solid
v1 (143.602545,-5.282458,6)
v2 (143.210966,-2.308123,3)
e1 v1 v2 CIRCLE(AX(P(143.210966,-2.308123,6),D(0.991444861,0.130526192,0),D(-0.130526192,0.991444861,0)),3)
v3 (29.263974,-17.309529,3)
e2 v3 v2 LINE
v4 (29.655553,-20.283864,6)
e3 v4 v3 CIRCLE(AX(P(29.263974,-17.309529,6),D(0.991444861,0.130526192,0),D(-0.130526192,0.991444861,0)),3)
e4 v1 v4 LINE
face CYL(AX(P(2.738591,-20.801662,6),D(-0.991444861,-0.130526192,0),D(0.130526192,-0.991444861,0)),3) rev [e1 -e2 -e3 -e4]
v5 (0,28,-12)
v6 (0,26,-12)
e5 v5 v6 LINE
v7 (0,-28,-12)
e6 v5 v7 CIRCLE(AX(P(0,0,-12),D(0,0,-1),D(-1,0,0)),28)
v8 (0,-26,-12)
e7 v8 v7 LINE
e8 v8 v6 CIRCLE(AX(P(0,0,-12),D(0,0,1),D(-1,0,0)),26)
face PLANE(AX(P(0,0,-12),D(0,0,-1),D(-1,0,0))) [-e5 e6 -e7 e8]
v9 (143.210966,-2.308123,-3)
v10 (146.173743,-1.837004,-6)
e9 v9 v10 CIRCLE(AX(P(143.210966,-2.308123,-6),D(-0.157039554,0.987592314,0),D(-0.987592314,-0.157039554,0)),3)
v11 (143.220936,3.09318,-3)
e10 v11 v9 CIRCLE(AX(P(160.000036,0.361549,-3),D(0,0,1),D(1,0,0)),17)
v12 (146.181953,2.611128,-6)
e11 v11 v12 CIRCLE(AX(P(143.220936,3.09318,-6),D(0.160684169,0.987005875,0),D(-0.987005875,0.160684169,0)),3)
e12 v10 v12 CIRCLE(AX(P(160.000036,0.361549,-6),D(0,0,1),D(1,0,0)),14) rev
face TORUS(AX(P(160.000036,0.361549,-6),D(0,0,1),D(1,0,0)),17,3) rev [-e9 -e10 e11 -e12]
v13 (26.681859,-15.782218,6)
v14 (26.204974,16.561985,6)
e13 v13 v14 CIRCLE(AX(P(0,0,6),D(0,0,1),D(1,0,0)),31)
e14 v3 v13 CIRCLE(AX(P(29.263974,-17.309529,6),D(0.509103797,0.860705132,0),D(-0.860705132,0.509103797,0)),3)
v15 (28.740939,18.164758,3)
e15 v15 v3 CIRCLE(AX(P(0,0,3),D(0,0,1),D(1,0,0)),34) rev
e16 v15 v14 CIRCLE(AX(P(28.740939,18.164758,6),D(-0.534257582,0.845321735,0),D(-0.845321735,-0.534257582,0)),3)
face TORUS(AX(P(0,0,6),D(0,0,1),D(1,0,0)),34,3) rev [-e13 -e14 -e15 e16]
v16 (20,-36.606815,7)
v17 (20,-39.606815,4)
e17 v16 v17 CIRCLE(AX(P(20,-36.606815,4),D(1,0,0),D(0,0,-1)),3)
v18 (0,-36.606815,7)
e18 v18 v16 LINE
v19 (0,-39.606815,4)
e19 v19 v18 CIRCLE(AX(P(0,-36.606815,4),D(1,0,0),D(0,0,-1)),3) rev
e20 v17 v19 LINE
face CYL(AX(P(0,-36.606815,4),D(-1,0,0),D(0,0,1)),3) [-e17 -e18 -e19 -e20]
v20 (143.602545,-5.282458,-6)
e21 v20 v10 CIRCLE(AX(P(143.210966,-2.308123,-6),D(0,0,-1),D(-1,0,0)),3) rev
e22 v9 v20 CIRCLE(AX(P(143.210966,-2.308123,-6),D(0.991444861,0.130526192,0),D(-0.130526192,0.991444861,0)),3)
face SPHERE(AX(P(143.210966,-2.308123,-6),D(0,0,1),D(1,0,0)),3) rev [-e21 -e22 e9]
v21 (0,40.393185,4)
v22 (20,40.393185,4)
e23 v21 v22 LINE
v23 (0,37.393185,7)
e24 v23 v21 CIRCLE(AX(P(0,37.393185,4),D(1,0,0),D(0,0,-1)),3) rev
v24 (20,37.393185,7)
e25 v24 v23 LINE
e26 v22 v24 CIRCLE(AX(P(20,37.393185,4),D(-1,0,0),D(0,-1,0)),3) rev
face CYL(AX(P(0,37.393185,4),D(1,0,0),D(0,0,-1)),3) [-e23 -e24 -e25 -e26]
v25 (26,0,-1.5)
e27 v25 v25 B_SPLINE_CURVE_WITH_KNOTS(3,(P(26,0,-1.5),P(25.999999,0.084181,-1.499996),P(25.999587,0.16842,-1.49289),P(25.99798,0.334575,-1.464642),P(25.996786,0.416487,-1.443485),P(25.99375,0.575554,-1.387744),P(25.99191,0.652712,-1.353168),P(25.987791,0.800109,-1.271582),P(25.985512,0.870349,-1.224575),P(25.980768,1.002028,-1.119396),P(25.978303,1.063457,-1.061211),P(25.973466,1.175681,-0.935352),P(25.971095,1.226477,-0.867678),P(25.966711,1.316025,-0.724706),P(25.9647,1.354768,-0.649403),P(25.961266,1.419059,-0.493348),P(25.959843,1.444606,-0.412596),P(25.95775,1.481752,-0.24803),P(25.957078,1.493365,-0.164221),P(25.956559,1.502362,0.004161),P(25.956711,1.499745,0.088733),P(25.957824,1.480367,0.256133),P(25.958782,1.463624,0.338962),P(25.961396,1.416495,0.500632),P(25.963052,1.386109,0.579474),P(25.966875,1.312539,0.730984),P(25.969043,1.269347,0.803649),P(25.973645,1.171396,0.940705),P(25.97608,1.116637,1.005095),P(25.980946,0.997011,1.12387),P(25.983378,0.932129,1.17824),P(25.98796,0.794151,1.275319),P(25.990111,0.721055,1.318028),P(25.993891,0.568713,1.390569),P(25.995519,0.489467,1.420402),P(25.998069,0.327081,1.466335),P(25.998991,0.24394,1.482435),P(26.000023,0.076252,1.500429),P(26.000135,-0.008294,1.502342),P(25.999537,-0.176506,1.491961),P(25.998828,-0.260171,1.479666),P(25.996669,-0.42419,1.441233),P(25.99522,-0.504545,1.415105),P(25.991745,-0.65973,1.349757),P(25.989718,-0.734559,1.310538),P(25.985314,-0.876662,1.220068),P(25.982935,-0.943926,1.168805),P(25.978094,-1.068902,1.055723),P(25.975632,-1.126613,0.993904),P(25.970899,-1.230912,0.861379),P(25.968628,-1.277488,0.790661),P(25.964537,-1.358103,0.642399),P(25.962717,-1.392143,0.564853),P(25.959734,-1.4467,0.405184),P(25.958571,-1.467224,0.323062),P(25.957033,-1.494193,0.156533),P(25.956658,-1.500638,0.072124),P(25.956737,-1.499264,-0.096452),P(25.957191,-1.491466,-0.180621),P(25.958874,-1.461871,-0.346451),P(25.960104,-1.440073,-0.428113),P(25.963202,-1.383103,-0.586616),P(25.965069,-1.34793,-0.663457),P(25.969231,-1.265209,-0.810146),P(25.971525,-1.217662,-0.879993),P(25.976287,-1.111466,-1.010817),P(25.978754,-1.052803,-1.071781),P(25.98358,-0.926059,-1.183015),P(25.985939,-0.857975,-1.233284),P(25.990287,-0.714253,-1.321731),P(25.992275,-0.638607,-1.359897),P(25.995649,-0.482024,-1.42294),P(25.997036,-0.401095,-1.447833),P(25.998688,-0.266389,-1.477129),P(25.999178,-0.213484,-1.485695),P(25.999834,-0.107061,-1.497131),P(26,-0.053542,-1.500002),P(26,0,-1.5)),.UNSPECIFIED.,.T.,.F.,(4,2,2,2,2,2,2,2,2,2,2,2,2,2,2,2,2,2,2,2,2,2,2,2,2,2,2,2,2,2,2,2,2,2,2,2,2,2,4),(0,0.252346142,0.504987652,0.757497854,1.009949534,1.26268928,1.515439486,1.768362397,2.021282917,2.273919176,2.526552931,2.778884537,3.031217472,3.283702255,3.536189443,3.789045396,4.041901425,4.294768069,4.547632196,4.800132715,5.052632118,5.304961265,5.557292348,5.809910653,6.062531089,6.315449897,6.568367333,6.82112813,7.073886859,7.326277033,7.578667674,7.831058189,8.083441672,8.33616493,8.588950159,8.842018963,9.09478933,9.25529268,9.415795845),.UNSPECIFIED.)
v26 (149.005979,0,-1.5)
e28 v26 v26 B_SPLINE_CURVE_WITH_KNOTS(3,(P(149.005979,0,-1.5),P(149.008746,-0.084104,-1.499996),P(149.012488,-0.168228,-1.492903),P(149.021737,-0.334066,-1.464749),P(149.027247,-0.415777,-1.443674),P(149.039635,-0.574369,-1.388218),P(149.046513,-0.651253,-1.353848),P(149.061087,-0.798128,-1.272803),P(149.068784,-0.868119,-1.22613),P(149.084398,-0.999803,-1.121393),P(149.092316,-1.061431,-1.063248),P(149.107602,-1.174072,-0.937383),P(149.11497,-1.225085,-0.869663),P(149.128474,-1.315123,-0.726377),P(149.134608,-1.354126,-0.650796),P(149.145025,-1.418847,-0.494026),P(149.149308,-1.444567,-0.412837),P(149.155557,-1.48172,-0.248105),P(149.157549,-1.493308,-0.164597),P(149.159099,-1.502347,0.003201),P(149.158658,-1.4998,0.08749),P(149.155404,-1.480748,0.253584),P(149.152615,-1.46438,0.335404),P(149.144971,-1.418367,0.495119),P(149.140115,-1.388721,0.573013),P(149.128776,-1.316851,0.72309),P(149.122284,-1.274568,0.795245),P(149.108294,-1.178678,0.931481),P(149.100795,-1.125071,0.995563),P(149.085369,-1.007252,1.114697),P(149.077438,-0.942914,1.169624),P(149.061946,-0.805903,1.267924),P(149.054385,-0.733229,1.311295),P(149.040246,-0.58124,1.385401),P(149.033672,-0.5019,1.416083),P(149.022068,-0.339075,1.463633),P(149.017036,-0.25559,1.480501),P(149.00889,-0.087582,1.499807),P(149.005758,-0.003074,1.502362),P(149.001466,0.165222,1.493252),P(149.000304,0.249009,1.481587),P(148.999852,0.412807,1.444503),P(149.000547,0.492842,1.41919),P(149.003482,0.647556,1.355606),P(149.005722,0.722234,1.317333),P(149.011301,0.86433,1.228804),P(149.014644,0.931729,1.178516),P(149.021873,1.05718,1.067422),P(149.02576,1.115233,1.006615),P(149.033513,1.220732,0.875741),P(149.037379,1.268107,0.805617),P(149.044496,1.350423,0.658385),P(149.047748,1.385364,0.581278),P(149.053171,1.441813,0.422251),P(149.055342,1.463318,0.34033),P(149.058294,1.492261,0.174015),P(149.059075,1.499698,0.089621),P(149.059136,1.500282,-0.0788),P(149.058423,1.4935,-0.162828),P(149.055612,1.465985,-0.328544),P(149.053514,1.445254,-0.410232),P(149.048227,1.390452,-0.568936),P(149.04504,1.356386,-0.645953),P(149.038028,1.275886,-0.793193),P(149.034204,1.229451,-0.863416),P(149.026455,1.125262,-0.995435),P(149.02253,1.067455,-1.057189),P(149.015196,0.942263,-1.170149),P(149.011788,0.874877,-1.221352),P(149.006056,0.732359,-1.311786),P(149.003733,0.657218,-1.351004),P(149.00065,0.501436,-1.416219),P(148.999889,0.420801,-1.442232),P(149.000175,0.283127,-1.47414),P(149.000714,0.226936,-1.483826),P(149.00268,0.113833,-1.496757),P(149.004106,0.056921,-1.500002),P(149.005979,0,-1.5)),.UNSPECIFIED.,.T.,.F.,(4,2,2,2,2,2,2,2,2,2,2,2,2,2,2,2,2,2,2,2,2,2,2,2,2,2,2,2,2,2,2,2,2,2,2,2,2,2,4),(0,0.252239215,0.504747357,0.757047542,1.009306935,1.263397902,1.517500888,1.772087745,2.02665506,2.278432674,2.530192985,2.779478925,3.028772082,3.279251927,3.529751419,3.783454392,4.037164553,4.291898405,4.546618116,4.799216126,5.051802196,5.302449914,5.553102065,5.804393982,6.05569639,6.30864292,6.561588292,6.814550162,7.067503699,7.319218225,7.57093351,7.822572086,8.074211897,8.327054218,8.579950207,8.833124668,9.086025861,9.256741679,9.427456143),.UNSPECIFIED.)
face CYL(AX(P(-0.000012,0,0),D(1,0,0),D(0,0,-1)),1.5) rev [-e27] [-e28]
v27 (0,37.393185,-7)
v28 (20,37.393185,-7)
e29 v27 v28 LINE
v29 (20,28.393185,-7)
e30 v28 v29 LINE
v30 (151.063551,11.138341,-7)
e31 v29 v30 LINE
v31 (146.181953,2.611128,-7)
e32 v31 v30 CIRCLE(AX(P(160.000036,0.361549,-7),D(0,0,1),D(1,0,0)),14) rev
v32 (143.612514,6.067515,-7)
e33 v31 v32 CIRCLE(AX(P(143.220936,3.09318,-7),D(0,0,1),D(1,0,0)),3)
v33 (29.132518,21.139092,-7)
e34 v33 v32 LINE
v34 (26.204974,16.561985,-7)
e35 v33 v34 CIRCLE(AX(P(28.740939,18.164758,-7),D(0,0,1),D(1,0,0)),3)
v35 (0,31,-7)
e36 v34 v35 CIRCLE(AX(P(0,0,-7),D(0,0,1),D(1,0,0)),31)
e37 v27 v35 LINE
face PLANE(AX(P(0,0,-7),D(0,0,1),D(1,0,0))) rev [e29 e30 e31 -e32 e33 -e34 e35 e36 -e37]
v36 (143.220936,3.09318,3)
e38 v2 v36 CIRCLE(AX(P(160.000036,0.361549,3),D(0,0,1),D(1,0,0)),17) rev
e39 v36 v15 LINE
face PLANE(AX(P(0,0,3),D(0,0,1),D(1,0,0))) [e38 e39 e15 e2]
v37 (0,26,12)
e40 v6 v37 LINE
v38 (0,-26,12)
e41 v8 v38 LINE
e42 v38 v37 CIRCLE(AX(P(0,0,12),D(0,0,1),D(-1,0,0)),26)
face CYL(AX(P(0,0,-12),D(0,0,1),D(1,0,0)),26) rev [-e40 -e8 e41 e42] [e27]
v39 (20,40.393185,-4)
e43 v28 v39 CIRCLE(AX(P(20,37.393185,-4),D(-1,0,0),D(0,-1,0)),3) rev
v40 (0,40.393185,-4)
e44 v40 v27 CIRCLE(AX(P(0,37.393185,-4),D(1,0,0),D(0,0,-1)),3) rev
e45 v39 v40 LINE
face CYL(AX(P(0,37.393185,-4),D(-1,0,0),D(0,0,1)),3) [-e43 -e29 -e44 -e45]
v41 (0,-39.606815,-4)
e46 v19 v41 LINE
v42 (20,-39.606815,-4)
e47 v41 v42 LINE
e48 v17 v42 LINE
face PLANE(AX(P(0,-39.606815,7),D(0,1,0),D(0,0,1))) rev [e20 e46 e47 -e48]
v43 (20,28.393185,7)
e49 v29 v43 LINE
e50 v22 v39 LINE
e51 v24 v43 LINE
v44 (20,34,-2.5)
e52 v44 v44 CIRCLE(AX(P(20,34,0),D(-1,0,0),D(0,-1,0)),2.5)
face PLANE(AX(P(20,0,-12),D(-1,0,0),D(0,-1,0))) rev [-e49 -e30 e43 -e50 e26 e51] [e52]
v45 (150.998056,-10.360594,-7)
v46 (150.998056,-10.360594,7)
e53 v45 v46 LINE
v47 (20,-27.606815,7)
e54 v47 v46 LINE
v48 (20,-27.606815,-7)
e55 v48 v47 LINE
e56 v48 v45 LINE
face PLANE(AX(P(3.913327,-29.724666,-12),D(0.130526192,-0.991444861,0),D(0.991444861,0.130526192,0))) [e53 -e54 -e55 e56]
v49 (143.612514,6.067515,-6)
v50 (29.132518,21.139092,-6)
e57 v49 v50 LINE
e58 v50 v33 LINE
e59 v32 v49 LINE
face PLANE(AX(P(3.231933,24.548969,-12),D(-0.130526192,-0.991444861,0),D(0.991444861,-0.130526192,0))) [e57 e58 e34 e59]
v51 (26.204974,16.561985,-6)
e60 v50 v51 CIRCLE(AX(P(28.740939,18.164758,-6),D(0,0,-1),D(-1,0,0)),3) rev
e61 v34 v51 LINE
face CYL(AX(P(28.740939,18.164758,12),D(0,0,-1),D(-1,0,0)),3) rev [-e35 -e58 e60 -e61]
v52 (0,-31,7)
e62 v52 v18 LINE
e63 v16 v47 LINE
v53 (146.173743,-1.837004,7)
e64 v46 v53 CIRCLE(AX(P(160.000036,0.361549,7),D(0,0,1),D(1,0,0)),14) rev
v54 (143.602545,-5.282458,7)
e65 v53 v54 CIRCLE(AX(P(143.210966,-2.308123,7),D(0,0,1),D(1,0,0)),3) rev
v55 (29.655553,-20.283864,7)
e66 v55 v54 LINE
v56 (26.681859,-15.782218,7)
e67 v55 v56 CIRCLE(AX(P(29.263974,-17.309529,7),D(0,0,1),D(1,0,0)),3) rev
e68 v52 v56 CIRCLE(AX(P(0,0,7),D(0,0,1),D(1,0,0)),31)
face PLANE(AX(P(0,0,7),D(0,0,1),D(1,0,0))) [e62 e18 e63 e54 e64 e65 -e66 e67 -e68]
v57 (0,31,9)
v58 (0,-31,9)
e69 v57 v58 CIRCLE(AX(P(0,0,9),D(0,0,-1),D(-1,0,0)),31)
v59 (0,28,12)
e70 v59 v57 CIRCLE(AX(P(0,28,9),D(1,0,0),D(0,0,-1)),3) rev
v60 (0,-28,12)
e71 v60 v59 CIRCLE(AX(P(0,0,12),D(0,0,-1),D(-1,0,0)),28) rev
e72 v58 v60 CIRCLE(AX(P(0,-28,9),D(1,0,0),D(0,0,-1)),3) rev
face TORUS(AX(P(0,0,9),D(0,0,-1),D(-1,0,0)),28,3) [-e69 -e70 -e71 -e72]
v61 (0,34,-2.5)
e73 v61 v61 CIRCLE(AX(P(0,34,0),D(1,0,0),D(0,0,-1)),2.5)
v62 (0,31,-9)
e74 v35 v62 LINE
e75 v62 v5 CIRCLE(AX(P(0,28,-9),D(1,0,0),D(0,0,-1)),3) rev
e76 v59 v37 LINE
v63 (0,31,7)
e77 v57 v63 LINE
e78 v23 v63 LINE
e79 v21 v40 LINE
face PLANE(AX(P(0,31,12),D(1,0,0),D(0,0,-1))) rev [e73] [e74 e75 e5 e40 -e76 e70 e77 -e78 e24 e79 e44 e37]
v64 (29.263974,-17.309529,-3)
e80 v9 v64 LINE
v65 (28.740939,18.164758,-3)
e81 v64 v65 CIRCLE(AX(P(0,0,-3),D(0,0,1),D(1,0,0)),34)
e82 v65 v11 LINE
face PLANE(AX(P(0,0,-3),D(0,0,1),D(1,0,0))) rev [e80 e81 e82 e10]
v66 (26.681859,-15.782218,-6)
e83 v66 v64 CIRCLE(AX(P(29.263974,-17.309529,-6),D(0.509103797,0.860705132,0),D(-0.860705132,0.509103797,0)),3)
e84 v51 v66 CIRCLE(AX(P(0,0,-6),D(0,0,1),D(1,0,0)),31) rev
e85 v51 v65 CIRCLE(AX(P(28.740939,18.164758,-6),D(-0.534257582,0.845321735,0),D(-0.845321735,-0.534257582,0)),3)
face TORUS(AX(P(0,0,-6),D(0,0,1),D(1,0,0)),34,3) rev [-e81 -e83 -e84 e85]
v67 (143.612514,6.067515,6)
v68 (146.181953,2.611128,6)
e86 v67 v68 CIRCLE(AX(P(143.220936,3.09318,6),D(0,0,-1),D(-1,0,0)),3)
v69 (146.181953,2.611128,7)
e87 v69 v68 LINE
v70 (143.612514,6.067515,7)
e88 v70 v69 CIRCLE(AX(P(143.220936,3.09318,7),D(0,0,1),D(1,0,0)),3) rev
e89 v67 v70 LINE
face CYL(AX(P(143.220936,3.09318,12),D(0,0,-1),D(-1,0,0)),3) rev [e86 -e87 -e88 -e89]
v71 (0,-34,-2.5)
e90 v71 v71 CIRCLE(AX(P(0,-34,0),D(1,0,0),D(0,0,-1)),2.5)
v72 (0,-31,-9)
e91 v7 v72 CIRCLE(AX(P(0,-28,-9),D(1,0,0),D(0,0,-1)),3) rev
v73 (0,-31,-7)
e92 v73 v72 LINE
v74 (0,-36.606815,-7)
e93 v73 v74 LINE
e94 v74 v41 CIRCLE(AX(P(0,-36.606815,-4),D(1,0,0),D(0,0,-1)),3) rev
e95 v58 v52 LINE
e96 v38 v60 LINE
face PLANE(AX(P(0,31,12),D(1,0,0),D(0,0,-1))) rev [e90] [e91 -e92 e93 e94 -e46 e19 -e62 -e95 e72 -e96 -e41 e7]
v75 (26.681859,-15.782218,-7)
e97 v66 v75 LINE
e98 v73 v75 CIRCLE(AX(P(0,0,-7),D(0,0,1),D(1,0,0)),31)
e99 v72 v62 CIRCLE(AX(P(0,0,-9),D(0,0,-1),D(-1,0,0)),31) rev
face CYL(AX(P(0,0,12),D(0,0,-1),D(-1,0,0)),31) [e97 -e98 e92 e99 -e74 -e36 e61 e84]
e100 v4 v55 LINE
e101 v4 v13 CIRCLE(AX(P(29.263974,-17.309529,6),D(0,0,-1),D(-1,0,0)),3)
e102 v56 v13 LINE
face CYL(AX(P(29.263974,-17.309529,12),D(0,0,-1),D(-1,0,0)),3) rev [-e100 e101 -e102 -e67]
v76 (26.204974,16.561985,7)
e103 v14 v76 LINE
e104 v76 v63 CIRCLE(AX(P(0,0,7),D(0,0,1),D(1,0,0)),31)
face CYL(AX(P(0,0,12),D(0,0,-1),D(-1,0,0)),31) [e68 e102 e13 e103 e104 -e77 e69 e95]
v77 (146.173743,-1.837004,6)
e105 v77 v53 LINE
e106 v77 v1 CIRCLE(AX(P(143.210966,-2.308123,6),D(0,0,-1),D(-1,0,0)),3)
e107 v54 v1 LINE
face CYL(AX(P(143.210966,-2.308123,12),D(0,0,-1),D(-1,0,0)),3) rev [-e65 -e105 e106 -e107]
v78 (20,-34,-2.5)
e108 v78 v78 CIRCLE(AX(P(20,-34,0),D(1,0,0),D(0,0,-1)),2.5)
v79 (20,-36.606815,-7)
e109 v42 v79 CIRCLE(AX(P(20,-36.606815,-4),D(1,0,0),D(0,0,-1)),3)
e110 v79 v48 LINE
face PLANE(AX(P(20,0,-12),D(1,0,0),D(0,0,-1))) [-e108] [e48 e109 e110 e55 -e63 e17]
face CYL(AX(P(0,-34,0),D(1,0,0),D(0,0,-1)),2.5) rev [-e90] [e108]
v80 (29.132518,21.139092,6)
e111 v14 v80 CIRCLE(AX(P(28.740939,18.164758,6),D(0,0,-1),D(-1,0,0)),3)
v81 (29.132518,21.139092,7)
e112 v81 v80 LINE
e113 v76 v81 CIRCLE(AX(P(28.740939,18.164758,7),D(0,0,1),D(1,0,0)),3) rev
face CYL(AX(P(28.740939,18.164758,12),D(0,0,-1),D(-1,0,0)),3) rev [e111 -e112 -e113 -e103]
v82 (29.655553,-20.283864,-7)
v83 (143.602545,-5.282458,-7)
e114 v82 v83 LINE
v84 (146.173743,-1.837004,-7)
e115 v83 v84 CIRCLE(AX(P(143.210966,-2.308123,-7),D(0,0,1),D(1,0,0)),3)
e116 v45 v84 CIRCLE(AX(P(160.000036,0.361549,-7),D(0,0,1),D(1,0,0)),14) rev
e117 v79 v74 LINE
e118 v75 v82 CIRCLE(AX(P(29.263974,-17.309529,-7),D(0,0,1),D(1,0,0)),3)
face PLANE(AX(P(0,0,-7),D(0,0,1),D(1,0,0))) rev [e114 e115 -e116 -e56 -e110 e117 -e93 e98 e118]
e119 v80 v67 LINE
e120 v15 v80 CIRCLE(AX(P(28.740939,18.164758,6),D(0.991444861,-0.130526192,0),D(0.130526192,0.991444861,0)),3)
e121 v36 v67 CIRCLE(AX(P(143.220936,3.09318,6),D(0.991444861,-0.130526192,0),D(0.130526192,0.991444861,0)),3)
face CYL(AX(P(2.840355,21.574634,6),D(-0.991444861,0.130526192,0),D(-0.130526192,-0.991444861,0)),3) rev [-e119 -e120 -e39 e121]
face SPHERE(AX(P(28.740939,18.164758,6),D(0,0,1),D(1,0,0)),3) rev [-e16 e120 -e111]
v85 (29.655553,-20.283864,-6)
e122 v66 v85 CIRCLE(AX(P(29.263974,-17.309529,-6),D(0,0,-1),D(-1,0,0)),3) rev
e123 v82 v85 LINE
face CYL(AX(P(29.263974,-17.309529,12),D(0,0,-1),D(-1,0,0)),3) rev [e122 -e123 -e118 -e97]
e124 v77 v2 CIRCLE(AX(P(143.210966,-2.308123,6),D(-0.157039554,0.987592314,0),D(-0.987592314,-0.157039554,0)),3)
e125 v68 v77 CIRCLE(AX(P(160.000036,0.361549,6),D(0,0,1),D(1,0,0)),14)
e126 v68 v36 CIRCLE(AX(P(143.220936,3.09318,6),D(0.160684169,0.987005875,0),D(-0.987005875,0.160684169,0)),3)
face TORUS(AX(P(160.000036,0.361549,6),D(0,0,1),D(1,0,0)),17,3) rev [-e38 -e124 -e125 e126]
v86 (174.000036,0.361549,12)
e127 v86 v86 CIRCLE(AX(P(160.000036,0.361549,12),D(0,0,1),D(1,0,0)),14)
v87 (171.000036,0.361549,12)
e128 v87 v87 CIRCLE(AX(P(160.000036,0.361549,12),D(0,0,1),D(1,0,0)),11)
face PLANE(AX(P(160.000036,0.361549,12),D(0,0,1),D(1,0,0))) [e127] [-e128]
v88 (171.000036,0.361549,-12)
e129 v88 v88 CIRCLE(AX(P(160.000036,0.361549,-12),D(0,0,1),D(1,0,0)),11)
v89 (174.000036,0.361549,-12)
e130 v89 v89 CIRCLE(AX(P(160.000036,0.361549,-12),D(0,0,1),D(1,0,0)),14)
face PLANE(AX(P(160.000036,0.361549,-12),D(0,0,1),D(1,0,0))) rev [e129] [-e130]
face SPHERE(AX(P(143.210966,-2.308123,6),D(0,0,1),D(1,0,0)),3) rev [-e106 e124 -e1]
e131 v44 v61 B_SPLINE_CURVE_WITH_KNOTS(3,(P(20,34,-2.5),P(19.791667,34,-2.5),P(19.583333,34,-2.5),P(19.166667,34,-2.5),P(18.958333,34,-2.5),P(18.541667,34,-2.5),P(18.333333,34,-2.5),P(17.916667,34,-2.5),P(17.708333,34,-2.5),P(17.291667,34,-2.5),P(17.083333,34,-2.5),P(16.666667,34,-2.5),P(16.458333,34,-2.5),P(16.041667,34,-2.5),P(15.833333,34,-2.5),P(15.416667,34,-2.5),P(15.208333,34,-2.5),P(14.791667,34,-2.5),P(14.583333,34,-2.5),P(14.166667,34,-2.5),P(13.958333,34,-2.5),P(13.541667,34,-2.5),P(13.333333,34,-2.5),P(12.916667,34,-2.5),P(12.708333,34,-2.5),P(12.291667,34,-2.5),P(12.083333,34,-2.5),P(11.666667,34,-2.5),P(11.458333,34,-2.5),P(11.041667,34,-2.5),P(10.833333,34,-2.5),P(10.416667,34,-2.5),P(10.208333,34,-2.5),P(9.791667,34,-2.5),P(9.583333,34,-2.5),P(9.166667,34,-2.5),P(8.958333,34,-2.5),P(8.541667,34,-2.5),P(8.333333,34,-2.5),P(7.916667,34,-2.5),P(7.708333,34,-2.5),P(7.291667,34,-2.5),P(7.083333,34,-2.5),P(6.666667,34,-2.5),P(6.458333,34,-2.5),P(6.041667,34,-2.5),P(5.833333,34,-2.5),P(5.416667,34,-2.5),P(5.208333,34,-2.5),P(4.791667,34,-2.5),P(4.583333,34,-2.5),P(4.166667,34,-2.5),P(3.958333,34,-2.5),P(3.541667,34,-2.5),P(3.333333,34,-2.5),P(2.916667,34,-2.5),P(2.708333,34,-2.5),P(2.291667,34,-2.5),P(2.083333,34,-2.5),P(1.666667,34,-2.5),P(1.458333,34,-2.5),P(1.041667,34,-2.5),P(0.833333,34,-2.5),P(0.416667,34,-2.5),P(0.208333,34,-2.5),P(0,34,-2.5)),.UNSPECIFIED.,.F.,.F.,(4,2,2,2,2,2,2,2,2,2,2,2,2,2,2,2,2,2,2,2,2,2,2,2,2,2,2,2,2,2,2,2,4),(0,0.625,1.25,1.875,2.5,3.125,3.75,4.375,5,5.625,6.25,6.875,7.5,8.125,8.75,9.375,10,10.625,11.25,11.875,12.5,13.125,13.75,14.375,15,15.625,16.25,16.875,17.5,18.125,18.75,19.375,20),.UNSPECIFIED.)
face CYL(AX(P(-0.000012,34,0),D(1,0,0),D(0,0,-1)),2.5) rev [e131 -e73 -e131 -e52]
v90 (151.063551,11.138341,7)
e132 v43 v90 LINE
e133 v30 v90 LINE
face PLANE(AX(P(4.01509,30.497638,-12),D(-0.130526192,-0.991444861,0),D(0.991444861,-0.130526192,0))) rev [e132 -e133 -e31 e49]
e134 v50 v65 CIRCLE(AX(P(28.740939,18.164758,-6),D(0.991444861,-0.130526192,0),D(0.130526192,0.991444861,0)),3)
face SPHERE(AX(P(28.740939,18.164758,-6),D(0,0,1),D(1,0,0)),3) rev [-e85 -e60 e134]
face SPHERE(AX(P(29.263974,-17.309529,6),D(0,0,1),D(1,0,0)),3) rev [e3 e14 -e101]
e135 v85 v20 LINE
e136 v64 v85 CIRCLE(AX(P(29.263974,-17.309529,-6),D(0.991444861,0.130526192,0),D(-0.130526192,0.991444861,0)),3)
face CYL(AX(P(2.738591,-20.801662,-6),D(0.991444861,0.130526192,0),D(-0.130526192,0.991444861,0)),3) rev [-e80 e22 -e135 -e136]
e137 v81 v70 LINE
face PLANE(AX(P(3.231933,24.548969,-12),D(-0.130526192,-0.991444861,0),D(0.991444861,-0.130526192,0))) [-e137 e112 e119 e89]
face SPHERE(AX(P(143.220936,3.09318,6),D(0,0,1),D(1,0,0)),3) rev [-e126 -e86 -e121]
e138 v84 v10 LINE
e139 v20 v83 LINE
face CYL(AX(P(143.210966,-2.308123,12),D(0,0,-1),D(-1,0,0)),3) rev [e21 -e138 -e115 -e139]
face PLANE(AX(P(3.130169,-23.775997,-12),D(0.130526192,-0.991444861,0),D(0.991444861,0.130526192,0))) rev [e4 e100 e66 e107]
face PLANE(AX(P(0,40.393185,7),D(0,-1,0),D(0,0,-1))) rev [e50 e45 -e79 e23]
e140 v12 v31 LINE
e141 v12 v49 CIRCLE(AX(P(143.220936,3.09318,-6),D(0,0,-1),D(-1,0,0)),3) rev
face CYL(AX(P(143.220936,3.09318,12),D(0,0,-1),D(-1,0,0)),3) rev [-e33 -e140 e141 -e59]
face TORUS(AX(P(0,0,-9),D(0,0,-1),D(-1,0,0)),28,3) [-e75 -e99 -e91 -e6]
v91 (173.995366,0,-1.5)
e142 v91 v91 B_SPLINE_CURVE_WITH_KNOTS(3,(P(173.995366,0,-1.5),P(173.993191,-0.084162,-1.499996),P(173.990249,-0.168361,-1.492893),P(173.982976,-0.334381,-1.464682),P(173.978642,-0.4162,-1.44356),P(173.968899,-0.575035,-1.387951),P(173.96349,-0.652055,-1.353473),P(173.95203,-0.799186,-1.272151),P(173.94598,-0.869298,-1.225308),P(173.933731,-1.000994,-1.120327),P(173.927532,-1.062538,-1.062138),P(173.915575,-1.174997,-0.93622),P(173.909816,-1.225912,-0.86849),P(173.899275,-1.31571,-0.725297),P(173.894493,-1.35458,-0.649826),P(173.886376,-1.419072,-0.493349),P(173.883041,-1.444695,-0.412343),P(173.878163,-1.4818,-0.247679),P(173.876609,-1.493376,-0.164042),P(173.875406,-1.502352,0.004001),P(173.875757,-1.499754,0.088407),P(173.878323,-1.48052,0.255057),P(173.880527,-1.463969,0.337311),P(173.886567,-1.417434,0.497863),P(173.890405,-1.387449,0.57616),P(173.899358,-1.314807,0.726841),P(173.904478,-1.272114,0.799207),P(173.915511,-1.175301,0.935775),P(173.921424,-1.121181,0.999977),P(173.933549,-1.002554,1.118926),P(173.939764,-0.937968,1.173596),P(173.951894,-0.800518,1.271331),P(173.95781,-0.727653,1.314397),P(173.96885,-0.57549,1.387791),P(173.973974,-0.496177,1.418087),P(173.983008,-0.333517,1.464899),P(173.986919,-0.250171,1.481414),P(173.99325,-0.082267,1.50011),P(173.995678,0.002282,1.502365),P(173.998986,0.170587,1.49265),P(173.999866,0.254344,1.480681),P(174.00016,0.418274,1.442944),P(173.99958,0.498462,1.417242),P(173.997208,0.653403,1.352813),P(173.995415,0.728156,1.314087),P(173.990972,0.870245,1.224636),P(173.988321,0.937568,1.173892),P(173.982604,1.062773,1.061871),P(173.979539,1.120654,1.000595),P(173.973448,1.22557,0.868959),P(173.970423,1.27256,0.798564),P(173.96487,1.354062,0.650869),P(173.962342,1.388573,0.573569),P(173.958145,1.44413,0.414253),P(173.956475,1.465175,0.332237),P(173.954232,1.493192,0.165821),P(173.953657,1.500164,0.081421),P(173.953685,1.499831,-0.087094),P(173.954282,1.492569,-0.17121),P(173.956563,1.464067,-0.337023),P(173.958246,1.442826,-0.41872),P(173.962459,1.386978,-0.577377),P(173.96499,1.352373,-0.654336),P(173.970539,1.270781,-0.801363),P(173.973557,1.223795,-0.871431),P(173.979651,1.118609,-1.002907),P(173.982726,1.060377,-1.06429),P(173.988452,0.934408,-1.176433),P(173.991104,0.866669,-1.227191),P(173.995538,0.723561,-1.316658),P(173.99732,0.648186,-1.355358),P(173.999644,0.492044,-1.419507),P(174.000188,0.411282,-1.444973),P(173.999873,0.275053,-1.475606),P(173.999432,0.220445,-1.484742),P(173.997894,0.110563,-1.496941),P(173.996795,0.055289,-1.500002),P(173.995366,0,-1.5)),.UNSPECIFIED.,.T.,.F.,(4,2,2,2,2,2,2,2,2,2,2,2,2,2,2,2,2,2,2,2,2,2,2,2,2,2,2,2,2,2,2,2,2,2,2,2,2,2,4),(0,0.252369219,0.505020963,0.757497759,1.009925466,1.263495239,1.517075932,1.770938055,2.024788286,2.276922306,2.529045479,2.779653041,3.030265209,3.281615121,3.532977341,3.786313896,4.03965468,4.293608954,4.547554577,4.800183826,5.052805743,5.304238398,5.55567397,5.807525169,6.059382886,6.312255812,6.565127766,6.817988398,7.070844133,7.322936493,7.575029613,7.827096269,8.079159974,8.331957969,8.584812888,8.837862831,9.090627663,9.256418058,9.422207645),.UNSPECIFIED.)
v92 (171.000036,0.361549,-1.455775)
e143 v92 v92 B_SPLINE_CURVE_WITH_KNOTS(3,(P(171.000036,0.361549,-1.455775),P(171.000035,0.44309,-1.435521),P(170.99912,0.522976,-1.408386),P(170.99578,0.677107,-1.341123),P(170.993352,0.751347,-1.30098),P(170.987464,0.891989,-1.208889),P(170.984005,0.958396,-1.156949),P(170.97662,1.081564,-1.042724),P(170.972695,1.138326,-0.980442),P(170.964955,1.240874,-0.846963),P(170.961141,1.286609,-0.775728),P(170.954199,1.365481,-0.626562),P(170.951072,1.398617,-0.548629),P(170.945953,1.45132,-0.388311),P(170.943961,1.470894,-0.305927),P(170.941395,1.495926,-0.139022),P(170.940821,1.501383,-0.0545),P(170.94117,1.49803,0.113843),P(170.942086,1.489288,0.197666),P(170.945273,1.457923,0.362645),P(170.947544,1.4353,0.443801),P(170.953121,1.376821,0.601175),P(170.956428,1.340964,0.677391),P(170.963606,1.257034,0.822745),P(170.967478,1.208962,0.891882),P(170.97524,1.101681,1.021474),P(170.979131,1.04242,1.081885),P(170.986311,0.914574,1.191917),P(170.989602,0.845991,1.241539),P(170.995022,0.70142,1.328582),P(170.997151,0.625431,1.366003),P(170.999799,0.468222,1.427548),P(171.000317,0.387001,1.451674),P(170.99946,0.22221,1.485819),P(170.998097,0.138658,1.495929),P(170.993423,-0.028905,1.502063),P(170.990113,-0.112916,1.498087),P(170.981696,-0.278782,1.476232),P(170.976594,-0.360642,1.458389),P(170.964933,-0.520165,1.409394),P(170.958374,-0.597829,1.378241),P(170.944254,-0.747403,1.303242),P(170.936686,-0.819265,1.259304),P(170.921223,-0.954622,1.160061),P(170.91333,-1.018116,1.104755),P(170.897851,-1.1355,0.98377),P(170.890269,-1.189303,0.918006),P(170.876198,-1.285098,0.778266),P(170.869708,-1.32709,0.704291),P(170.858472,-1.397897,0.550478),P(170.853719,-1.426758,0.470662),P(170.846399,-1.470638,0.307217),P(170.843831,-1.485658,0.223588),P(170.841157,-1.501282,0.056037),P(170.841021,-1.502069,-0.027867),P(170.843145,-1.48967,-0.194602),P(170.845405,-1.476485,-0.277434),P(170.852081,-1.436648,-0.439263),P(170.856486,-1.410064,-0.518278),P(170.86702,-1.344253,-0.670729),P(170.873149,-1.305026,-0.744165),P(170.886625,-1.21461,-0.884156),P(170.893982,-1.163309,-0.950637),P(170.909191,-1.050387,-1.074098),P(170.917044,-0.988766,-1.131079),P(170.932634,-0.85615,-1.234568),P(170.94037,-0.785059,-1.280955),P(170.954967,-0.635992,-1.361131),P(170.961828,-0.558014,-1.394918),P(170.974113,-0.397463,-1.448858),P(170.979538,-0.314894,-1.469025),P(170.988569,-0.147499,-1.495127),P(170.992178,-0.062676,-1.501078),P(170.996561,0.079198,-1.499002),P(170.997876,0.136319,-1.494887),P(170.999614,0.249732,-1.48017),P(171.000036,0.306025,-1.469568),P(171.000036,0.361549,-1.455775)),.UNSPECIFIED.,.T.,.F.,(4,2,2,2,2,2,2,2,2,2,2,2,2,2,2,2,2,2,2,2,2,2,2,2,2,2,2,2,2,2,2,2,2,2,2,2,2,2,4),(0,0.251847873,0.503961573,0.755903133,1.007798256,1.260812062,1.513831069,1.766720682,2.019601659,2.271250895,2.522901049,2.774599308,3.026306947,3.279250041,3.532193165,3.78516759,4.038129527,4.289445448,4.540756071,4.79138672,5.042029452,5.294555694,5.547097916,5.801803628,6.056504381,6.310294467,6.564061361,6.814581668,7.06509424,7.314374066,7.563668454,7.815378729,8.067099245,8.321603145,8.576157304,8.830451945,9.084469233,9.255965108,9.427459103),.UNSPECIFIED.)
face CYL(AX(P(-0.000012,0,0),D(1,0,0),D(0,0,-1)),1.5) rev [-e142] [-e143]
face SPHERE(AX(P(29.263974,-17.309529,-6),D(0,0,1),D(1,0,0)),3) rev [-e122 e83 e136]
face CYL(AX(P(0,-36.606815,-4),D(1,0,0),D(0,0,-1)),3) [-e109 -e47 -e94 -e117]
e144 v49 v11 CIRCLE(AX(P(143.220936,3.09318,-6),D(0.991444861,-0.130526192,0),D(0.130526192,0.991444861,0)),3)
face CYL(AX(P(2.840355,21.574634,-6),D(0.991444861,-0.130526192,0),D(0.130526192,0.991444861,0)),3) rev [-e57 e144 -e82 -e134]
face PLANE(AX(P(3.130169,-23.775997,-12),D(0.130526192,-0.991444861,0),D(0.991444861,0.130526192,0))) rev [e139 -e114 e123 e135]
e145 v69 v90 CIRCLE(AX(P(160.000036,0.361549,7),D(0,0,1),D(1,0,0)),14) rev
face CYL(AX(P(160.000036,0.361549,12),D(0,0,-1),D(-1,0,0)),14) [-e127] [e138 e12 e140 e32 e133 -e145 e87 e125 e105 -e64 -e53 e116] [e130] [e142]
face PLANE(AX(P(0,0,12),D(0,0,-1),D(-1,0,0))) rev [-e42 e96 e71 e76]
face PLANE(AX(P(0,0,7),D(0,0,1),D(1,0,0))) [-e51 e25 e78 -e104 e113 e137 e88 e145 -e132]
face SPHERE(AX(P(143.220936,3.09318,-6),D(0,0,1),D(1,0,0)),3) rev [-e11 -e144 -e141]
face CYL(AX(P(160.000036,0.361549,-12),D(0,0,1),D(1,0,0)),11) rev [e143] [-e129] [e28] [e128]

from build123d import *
from build123d.topology import SkipClean

# Parameters (mm, degrees)
EXTRUDE_1_DEPTH          = 12
SKETCH_2_W               = 174
SKETCH_2_H               = 80
EXTRUDE_2_DEPTH          = 7
CUT_EXTRUDE_1_DEPTH      = 180.0296327
CUT_EXTRUDE_1_DEPTH_BACK = 180.0296327
SKETCH_5_R               = 14
EXTRUDE_5_DEPTH          = 12
CUT_EXTRUDE_2_DEPTH      = 181.23213316
CUT_EXTRUDE_2_DEPTH_BACK = 181.23213316
SKETCH_11_R              = 11
CUT_EXTRUDE_3_DEPTH      = 180.029667439
CUT_EXTRUDE_3_DEPTH_BACK = 180.029667439
CUT_EXTRUDE_4_DEPTH      = 180.029667439
CUT_EXTRUDE_4_DEPTH_BACK = 180.029667439
CUT_EXTRUDE_6_DEPTH      = 180.029667439
CUT_EXTRUDE_6_DEPTH_BACK = 180.029667439
EXTRUDE_6_DEPTH          = 3
CUT_EXTRUDE_7_DEPTH      = 180.029667439
CUT_EXTRUDE_7_DEPTH_BACK = 180.029667439
SKETCH_19_R              = 2.5
CUT_EXTRUDE_8_DEPTH      = 160.660954506
CUT_EXTRUDE_8_DEPTH_BACK = 160.660954506
SKETCH_20_R              = 2.5
CUT_EXTRUDE_9_DEPTH      = 180.029667439
CUT_EXTRUDE_9_DEPTH_BACK = 180.029667439
SKETCH_21_R              = 1.5
FILLET_1_R               = 3
FILLET_2_R               = 3
FILLET_3_R               = 3
FILLET_START             = -7
FILLET_4_DEPTH           = 14
FILLET_5_R               = 3
FILLET_6_R               = 3


with BuildPart() as part:
    # 草图1 → 凸台-拉伸1 (new, symmetric)
    with BuildSketch(Plane.XY):
        with BuildLine():
            Line((0, 31), (0, -31))
            ThreePointArc((0, -31), (31, 0), (0, 31))
        make_face()
    extrude(amount=EXTRUDE_1_DEPTH, both=True)

    # 草图2 → 凸台-拉伸2 (add, symmetric)
    with BuildSketch(Plane.XY):
        with Locations((87, 0.393184881)):
            Rectangle(SKETCH_2_W, SKETCH_2_H)
    extrude(amount=EXTRUDE_2_DEPTH, both=True)

    # 草图4 → 切除-拉伸1 (cut, two sides: drawn at the far end of the back side and taken through both)
    with BuildSketch(Plane.XY.offset(-CUT_EXTRUDE_1_DEPTH_BACK)):
        with BuildLine():
            Line((0, 26), (0, -26))
            ThreePointArc((0, -26), (26, 0), (0, 26))
        make_face()
    extrude(amount=CUT_EXTRUDE_1_DEPTH + CUT_EXTRUDE_1_DEPTH_BACK, mode=Mode.SUBTRACT)

    # 草图5 → 凸台-拉伸5 (add, symmetric)
    with BuildSketch(Plane.XY):
        with Locations((160.000035743, 0.361549397)):
            Circle(SKETCH_5_R)
    extrude(amount=EXTRUDE_5_DEPTH, both=True)

    # 草图11 → 切除-拉伸2 (cut, two sides: drawn at the far end of the back side and taken through both)
    with BuildSketch(Plane.XY.offset(12).offset(-CUT_EXTRUDE_2_DEPTH_BACK)):
        with Locations((160.000035743, 0.361549397)):
            Circle(SKETCH_11_R)
    extrude(amount=CUT_EXTRUDE_2_DEPTH + CUT_EXTRUDE_2_DEPTH_BACK, mode=Mode.SUBTRACT)

    # 草图12 → 切除-拉伸3 (cut, two sides: drawn at the far end of the back side and taken through both)
    with BuildSketch(Plane.XY.offset(-CUT_EXTRUDE_3_DEPTH_BACK)):
        with BuildLine():
            ThreePointArc((150.998055783, -10.360593896), (165.91494405, -12.327574282), (174.000035743, 0.361549397))
            Line((174.000035743, 0.361549397), (174, -39.606815119))
            Line((174, -39.606815119), (20, -39.606815119))
            Line((20, -39.606815119), (20, -27.606815119))
            Line((20, -27.606815119), (150.998055783, -10.360593896))
        make_face()
    extrude(amount=CUT_EXTRUDE_3_DEPTH + CUT_EXTRUDE_3_DEPTH_BACK, mode=Mode.SUBTRACT)

    # 草图13 → 切除-拉伸4 (cut, two sides: drawn at the far end of the back side and taken through both)
    with BuildSketch(Plane.XY.offset(-CUT_EXTRUDE_4_DEPTH_BACK)):
        with BuildLine():
            Line((20, 28.393184881), (151.063550898, 11.138341063))
            ThreePointArc((151.063550898, 11.138341063), (165.939252971, 13.039313345), (174, 0.393184881))
            Line((174, 0.393184881), (174, 40.393184881))
            Line((174, 40.393184881), (20, 40.393184881))
            Line((20, 40.393184881), (20, 28.393184881))
        make_face()
    extrude(amount=CUT_EXTRUDE_4_DEPTH + CUT_EXTRUDE_4_DEPTH_BACK, mode=Mode.SUBTRACT)

    # 草图14 → 切除-拉伸6 (cut, two sides: drawn at the far end of the back side and taken through both)
    with SkipClean():  # the faces are left unmerged after this step: merging them gives an invalid solid
        with BuildSketch(Plane.XY.offset(-CUT_EXTRUDE_6_DEPTH_BACK)):
            with BuildLine():
                Line((147.02443227, 5.618327355), (21.724512141, 22.114374787))
                ThreePointArc((21.724512141, 22.114374787), (30.993578045, 0.630967477), (22.606548392, -21.21188275))
                Line((22.606548392, -21.21188275), (147.000250841, -4.835141138))
                ThreePointArc((147.000250841, -4.835141138), (146.000073201, 0.393934732), (147.02443227, 5.618327355))
            make_face()
        extrude(amount=CUT_EXTRUDE_6_DEPTH + CUT_EXTRUDE_6_DEPTH_BACK, mode=Mode.SUBTRACT)
    add(part.part.scale(1), mode=Mode.REPLACE)  # the faces are merged on a copy

    # 草图17 → 凸台-拉伸6 (add, symmetric)
    with BuildSketch(Plane.XY):
        with BuildLine():
            ThreePointArc((22.606548392, -21.21188275), (30.993578045, 0.630967477), (21.724512141, 22.114374787))
            Line((21.724512141, 22.114374787), (147.02443227, 5.618327355))
            ThreePointArc((147.02443227, 5.618327355), (146.000073201, 0.393934732), (147.000250841, -4.835141138))
            Line((147.000250841, -4.835141138), (22.606548392, -21.21188275))
        make_face()
    extrude(amount=EXTRUDE_6_DEPTH, both=True)

    # 草图19 → 切除-拉伸7 (cut, two sides: drawn at the far end of the back side and taken through both)
    with BuildSketch(Plane(origin=(0, 0, 0), x_dir=(0, 0, -1), z_dir=(1, 0, 0)).offset(-CUT_EXTRUDE_7_DEPTH_BACK)):
        with Locations((0, 34)):
            Circle(SKETCH_19_R)
    extrude(amount=CUT_EXTRUDE_7_DEPTH + CUT_EXTRUDE_7_DEPTH_BACK, mode=Mode.SUBTRACT)

    # 草图20 → 切除-拉伸8 (cut, two sides: drawn at the far end of the back side and taken through both)
    with BuildSketch(Plane(origin=(20, 0, 0), x_dir=(0, 0, -1), z_dir=(1, 0, 0)).offset(-CUT_EXTRUDE_8_DEPTH_BACK)):
        with Locations((0, -34)):
            Circle(SKETCH_20_R)
    extrude(amount=CUT_EXTRUDE_8_DEPTH + CUT_EXTRUDE_8_DEPTH_BACK, mode=Mode.SUBTRACT)

    # 草图21 → 切除-拉伸9 (cut, two sides: drawn at the far end of the back side and taken through both)
    with BuildSketch(Plane(origin=(0, 0, 0), x_dir=(0, 0, -1), z_dir=(1, 0, 0)).offset(-CUT_EXTRUDE_9_DEPTH_BACK)):
        Circle(SKETCH_21_R)
    extrude(amount=CUT_EXTRUDE_9_DEPTH + CUT_EXTRUDE_9_DEPTH_BACK, mode=Mode.SUBTRACT)

    # 圆角1
    fillet_1_edges = [part.edges().sort_by_distance(p)[0] for p in [
        (10, -39.606815119, 7),
        (10, -39.606815119, -7),
        (10, 40.393184881, -7),
        (10, 40.393184881, 7),
    ]]
    fillet(fillet_1_edges, radius=FILLET_1_R)

    # 圆角2
    fillet_2_edges = [part.edges().sort_by_distance(p)[0] for p in [
        (31, 0, -12),
        (31, 0, 12),
    ]]
    fillet(fillet_2_edges, radius=FILLET_2_R)

    # 圆角3
    fillet_3_edges = [part.edges().sort_by_distance(p)[0] for p in [
        (22.606548392, -21.21188275, -5),
        (21.724512141, 22.114374787, -5),
        (21.724512141, 22.114374787, 5),
        (22.606548392, -21.21188275, 5),
    ]]
    fillet(fillet_3_edges, radius=FILLET_3_R)

    # 圆角4: read off the stored shape, not the designer's step
    # 圆角4 outline → 圆角4 (add)
    with SkipClean():  # the faces are left unmerged after this step: merging them gives an invalid solid
        with BuildSketch(Plane.XY.offset(FILLET_START)):
            with BuildLine():
                Line((147.02443227, 5.618327355), (143.612514441, 6.067514858))
                ThreePointArc((143.612514441, 6.067514858), (145.628554658, 4.882976839), (146.18195349, 2.611127766))
                ThreePointArc((146.18195349, 2.611127766), (146.519078394, 4.138292564), (147.02443227, 5.618327355))
            make_face()
            with BuildLine():
                ThreePointArc((147.000250841, -4.835141138), (146.503487598, -3.359094119), (146.173743348, -1.837004355))
                ThreePointArc((146.173743348, -1.837004355), (145.615277586, -4.102360388), (143.602544983, -5.2824576))
                Line((143.602544983, -5.2824576), (147.000250841, -4.835141138))
            make_face()
        extrude(amount=FILLET_4_DEPTH)

    # 圆角5
    fillet_5_edges = [part.edges().sort_by_distance(p)[0] for p in [
        (30.99663104, 0.457016597, 3),
        (86.372516009, 13.603303614, 3),
        (26.213672417, 19.781211811, 3),
        (26.760813079, -18.963065606, 3),
        (146.000059591, 0.387389859, 3),
        (86.629049021, -12.78316064, 3),
        (145.628554658, 4.882976839, 3),
        (145.615277586, -4.102360388, 3),
    ]]
    fillet(fillet_5_edges, radius=FILLET_5_R)

    # 圆角6
    fillet_6_edges = [part.edges().sort_by_distance(p)[0] for p in [
        (30.99663104, 0.457016597, -3),
        (86.372516009, 13.603303614, -3),
        (26.760813079, -18.963065606, -3),
        (26.213672417, 19.781211811, -3),
        (146.000059591, 0.387389859, -3),
        (86.629049021, -12.78316064, -3),
        (145.615277586, -4.102360388, -3),
        (145.628554658, 4.882976839, -3),
    ]]
    fillet(fillet_6_edges, radius=FILLET_6_R)


solid = part.part
